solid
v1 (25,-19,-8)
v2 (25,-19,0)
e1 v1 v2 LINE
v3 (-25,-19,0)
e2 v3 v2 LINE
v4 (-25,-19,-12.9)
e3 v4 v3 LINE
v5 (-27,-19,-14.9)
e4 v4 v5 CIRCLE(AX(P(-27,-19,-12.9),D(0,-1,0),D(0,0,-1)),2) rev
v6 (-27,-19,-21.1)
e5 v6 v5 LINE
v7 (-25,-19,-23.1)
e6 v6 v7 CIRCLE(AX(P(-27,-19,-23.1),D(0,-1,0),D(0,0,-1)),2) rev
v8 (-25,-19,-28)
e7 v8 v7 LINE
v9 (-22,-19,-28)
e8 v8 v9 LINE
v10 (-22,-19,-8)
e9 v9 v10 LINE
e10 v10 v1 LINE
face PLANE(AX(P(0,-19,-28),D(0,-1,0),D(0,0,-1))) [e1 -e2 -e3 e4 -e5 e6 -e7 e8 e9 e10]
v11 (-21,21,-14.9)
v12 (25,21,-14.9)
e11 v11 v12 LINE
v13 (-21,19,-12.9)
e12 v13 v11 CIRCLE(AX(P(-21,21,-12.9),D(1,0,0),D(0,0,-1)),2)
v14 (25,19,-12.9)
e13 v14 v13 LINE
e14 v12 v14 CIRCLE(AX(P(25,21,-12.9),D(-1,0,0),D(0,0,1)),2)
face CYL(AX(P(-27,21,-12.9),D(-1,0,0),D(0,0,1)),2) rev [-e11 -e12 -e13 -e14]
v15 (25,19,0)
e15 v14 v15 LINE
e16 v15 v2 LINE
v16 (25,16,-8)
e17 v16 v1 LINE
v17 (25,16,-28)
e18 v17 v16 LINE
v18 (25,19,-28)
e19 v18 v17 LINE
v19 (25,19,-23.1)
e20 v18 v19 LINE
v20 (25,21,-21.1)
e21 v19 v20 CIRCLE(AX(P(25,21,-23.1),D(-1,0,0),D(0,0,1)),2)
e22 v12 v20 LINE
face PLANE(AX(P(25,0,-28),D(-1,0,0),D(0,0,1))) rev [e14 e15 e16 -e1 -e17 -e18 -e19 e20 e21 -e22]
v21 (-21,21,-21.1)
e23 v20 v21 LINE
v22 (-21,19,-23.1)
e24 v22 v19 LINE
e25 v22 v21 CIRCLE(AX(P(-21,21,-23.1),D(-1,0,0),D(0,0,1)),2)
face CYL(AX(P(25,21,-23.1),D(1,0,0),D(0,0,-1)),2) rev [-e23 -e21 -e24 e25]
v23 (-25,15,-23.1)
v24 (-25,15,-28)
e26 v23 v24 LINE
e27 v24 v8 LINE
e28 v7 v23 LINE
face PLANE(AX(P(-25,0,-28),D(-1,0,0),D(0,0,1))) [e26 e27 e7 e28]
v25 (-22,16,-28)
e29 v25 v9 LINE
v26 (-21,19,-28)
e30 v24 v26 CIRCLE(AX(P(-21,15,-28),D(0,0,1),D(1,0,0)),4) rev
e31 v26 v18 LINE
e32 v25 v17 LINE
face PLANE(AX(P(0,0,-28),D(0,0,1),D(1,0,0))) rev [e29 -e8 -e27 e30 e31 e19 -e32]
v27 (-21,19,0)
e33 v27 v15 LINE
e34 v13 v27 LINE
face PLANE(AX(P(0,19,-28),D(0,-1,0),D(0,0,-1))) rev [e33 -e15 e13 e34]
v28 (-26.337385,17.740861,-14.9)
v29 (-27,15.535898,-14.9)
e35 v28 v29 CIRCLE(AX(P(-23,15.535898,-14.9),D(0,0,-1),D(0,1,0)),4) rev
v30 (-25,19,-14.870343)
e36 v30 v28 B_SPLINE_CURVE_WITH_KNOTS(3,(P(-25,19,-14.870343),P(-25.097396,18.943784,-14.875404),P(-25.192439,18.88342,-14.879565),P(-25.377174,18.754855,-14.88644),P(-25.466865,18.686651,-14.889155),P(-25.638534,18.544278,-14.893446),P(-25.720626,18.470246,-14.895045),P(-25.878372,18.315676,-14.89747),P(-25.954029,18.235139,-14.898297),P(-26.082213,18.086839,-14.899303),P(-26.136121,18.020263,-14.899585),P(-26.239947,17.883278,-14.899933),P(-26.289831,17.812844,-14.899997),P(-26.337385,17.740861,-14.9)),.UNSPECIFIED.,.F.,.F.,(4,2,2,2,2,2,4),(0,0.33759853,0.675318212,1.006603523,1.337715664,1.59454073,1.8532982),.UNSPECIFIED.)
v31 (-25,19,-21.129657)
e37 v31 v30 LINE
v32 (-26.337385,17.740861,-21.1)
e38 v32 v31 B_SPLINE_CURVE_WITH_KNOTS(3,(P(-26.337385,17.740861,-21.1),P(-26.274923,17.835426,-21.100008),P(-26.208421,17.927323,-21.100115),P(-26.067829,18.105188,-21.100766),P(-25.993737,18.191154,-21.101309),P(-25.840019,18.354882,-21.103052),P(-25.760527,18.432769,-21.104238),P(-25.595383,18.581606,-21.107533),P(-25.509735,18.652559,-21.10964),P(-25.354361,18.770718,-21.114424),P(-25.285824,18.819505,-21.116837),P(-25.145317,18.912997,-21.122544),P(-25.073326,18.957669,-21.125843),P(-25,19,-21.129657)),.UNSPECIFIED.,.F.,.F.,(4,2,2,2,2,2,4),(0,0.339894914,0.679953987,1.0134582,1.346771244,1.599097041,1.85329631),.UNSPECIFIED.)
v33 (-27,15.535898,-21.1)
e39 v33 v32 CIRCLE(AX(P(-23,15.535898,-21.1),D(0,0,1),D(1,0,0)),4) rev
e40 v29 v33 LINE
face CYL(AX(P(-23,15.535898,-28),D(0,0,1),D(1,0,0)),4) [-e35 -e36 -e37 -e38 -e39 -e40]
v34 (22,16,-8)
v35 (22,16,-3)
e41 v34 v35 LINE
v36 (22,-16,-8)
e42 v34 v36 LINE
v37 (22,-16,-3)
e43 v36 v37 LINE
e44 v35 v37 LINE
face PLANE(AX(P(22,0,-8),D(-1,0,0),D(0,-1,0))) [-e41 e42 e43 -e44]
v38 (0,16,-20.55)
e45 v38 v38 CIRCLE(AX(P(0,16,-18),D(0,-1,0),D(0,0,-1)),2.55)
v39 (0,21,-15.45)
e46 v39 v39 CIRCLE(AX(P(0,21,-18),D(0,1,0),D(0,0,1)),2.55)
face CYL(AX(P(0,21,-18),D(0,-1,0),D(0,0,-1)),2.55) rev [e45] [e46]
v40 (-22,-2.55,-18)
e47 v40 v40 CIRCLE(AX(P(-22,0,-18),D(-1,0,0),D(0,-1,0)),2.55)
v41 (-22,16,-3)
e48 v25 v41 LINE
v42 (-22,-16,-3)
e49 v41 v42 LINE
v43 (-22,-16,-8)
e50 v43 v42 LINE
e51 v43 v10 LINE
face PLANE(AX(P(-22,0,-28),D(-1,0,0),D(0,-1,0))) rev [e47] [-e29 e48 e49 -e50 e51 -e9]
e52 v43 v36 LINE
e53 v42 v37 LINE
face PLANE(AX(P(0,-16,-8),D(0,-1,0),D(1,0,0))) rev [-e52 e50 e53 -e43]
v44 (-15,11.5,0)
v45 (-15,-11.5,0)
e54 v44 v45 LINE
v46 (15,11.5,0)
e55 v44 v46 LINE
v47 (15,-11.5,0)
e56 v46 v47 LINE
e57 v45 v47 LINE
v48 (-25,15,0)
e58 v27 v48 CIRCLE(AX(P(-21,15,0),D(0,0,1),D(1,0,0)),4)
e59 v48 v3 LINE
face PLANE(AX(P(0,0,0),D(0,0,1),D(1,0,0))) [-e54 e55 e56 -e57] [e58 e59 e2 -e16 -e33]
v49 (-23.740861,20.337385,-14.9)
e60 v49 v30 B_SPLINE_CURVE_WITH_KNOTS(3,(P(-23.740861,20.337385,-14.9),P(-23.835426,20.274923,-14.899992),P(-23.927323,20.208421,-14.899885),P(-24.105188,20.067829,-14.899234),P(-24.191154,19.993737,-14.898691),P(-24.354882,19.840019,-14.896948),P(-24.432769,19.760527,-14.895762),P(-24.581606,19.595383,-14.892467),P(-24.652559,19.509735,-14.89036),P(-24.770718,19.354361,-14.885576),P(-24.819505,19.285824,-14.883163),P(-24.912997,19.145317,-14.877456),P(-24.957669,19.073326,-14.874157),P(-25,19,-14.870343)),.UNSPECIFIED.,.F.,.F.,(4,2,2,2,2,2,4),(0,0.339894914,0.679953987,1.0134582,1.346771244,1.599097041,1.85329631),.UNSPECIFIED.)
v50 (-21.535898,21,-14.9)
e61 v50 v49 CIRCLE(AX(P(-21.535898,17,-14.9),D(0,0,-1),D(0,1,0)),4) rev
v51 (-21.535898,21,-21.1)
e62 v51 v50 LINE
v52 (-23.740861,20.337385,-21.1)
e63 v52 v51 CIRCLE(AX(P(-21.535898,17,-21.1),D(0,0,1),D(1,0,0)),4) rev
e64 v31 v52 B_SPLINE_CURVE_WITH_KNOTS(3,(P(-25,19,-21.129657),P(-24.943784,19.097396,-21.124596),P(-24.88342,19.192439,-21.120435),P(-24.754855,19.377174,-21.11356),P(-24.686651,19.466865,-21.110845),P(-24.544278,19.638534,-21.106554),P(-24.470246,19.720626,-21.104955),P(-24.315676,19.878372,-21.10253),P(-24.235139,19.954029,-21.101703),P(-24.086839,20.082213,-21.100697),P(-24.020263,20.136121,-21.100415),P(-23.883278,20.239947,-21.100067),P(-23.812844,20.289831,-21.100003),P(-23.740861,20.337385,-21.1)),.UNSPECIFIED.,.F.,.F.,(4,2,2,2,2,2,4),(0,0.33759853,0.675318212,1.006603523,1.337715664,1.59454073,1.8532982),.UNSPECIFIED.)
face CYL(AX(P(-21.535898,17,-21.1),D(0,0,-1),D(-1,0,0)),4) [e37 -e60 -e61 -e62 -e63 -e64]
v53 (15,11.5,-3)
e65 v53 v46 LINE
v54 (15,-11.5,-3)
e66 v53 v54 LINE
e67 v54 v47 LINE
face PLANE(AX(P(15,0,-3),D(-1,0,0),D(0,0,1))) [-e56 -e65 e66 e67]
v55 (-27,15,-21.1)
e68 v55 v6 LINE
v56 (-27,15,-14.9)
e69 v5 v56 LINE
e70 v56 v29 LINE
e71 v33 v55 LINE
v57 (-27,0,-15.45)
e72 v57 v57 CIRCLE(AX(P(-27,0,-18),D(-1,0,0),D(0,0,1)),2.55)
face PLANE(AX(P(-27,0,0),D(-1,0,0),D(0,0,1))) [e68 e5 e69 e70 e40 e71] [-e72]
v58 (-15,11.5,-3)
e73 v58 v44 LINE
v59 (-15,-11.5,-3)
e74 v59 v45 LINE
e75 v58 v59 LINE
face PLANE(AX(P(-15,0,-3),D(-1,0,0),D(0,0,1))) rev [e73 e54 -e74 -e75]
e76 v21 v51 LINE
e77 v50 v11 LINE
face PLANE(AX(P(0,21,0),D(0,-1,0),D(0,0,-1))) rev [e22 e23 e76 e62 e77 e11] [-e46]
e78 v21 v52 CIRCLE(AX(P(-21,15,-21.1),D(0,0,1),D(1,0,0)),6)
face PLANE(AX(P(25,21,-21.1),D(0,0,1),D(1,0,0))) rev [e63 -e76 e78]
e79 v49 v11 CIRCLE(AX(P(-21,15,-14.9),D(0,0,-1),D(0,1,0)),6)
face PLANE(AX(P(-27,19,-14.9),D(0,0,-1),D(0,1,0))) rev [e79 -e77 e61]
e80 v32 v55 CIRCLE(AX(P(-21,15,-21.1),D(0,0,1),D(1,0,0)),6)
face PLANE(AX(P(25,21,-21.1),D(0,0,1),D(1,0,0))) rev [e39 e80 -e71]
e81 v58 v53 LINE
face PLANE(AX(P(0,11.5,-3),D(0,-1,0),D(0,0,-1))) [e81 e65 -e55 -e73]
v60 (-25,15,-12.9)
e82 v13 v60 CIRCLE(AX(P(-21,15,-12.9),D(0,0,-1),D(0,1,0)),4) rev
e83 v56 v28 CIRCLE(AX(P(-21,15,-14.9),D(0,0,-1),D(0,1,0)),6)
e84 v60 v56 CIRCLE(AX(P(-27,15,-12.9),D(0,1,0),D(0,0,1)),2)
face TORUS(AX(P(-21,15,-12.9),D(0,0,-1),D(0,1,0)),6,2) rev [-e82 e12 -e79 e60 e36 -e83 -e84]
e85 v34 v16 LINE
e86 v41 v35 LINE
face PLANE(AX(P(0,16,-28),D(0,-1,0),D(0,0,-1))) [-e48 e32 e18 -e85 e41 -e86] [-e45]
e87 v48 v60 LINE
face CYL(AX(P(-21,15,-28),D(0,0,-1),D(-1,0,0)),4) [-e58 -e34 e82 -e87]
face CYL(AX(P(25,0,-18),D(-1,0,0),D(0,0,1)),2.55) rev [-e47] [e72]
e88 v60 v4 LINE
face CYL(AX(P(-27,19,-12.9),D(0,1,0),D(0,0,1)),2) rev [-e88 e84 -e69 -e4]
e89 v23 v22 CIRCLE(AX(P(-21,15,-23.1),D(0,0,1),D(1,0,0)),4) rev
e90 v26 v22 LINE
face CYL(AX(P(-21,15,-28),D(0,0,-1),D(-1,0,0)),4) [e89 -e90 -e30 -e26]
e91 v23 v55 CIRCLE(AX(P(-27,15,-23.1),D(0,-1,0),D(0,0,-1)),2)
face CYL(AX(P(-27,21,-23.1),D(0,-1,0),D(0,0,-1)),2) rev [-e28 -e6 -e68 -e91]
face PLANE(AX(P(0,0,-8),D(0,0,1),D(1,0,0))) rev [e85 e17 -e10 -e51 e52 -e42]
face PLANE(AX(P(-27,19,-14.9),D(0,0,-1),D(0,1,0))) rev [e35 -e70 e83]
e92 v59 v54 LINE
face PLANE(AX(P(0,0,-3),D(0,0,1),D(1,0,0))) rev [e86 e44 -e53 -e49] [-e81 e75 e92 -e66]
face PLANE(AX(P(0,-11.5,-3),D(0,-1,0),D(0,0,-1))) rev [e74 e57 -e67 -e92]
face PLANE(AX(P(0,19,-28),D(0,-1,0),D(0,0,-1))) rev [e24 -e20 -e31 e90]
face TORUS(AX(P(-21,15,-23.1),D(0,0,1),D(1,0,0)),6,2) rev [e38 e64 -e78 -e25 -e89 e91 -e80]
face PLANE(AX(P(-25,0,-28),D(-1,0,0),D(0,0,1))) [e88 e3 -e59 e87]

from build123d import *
from build123d.topology import SkipClean

# Parameters (mm, degrees)
SKETCH_1_W          = 44
SKETCH_1_H          = 32
SKETCH_1_W_2        = 30
SKETCH_1_H_2        = 23
EXTRUDE_1_DEPTH     = 3
SKETCH_1_3_W        = 3
SKETCH_1_3_H        = 3
EXTRUDE_2_DEPTH     = 28
EXTRUDE_3_DEPTH     = 8
SKETCH_2_R          = 2.55
CUT_EXTRUDE_2_DEPTH = 61.373835392
EXTRUDE_START       = 2
SKETCH_2_3_W        = 6.2
SKETCH_2_3_H        = 38
SKETCH_2_3_R        = 2.55
EXTRUDE_4_DEPTH     = 2
SKETCH_3_W          = 50
SKETCH_3_H          = 6.2
SKETCH_3_R          = 2.55
EXTRUDE_5_DEPTH     = 2
SKETCH_3_2_R        = 2.55
CUT_EXTRUDE_3_DEPTH = 55.378304497
FILLET_2_R          = 4
FILLET_3_R          = 2
FILLET_4_R          = 4


with BuildPart() as part:
    # 草图1 → 凸台-拉伸1 (new body)
    with BuildSketch(Plane.XY):
        Rectangle(SKETCH_1_W, SKETCH_1_H)
        Rectangle(SKETCH_1_W_2, SKETCH_1_H_2, mode=Mode.SUBTRACT)
    extrude(amount=-EXTRUDE_1_DEPTH)

    # 草图1<3> → 凸台-拉伸2 (add)
    with BuildSketch(Plane.XY):
        Polygon((-22, -16), (-22, 16), (22, 16), (22, 19), (-25, 19), (-25, -16), align=None)
        with Locations((-23.5, -17.5)):
            Rectangle(SKETCH_1_3_W, SKETCH_1_3_H)
        with Locations((23.5, 17.5)):
            Rectangle(SKETCH_1_3_W, SKETCH_1_3_H)
    extrude(amount=-EXTRUDE_2_DEPTH)

    # 草图1<4> → 凸台-拉伸3 (add)
    with BuildSketch(Plane.XY):
        Polygon((25, 16), (22, 16), (22, -16), (-22, -16), (-22, -19), (25, -19), align=None)
    extrude(amount=-EXTRUDE_3_DEPTH)

    # 草图2 → 切除-拉伸2 (cut, through all)
    with BuildSketch(Plane.ZY.offset(25)):
        with Locations((-18, 0)):
            Circle(SKETCH_2_R)
    extrude(amount=-CUT_EXTRUDE_2_DEPTH, mode=Mode.SUBTRACT)

    # 草图2<3> → 凸台-拉伸4 (add)
    with BuildSketch(Plane.ZY.offset(25).offset(EXTRUDE_START)):
        with Locations((-18, 0)):
            Rectangle(SKETCH_2_3_W, SKETCH_2_3_H)
        with Locations((-18, 0)):
            Circle(SKETCH_2_3_R, mode=Mode.SUBTRACT)
    extrude(amount=-EXTRUDE_4_DEPTH)

    # 草图3 → 凸台-拉伸5 (add)
    with BuildSketch(Plane(origin=(0, 19, 0), x_dir=(1, 0, 0), z_dir=(0, 1, 0))):
        with Locations((0, 18)):
            Rectangle(SKETCH_3_W, SKETCH_3_H)
        with Locations(Location((0, 18, 0), (0, 0, 270))):
            Circle(SKETCH_3_R, mode=Mode.SUBTRACT)
    extrude(amount=EXTRUDE_5_DEPTH)

    # 草图3<2> → 切除-拉伸3 (cut, through all)
    with SkipClean():  # the faces are left unmerged after this step: merging them gives an invalid solid
        with BuildSketch(Plane(origin=(0, 19, 0), x_dir=(1, 0, 0), z_dir=(0, 1, 0))):
            with Locations(Location((0, 18, 0), (0, 0, 90))):
                Circle(SKETCH_3_2_R)
        extrude(amount=-CUT_EXTRUDE_3_DEPTH, mode=Mode.SUBTRACT)
    add(part.part.scale(1), mode=Mode.REPLACE)  # the faces are merged on a copy

    # 圆角2
    # the kernel refuses this fillet: 4 mm, written as the material it takes off along each edge
    with BuildSketch(Plane(origin=(-25, 19, -11.1), x_dir=(1, 0, 0), z_dir=(0, 0, -1))) as fillet_2_piece_1_section:
        with BuildLine():
            CenterArc((FILLET_2_R, FILLET_2_R), FILLET_2_R, 180, 90)
            Line((0, FILLET_2_R), (0, 0))
            Line((0, 0), (FILLET_2_R, 0))
        make_face()
    fillet_2_piece_1 = extrude(amount=26.9, mode=Mode.PRIVATE)
    fillet_2_piece_1 = split(fillet_2_piece_1, bisect_by=Plane(origin=(-24.094419543, 18.094419543, -14.9), z_dir=(0, 0, 1)), keep=Keep.TOP, mode=Mode.PRIVATE)
    add(fillet_2_piece_1, mode=Mode.SUBTRACT)
    with BuildSketch(Plane(origin=(-25, 19, -21.1), x_dir=(1, 0, 0), z_dir=(0, 0, -1))) as fillet_2_piece_2:
        with BuildLine():
            CenterArc((FILLET_2_R, FILLET_2_R), FILLET_2_R, 180, 90)
            Line((0, FILLET_2_R), (0, 0))
            Line((0, 0), (FILLET_2_R, 0))
        make_face()
    extrude(amount=16.9, mode=Mode.SUBTRACT)
    with BuildSketch(Plane(origin=(-25, 19, 10), x_dir=(1, 0, 0), z_dir=(0, 0, -1))) as fillet_2_piece_3:
        with BuildLine():
            CenterArc((FILLET_2_R, FILLET_2_R), FILLET_2_R, 180, 90)
            Line((0, FILLET_2_R), (0, 0))
            Line((0, 0), (FILLET_2_R, 0))
        make_face()
    extrude(amount=24.9, mode=Mode.SUBTRACT)
    with BuildSketch(Plane(origin=(-25, 19, 10), x_dir=(1, 0, 0), z_dir=(0, 0, -1))) as fillet_2_piece_4_section:
        with BuildLine():
            CenterArc((FILLET_2_R, FILLET_2_R), FILLET_2_R, 180, 90)
            Line((0, FILLET_2_R), (0, 0))
            Line((0, 0), (FILLET_2_R, 0))
        make_face()
    fillet_2_piece_4 = extrude(amount=34.9, mode=Mode.PRIVATE)
    fillet_2_piece_4 = split(fillet_2_piece_4, bisect_by=Plane(origin=(-24.094419543, 18.094419543, -21.1), z_dir=(0, 0, -1)), keep=Keep.TOP, mode=Mode.PRIVATE)
    add(fillet_2_piece_4, mode=Mode.SUBTRACT)

    # 圆角3
    # the kernel refuses this fillet: 2 mm, written as the material it adds along each edge
    with BuildSketch(Plane(origin=(-25, 15, -14.9), x_dir=(0, 0, 1), z_dir=(0, -1, 0)), Plane(origin=(-25, -19, -21.1), x_dir=(0, 0, -1), z_dir=(0, 1, 0))) as fillet_3_piece_1:
        with BuildLine():
            CenterArc((FILLET_3_R, FILLET_3_R), FILLET_3_R, 180, 90)
            Line((0, FILLET_3_R), (0, 0))
            Line((0, 0), (FILLET_3_R, 0))
        make_face()
    extrude(amount=34)
    with BuildSketch(Plane(origin=(-21, 19, -14.9), x_dir=(0, 1, 0), z_dir=(1, 0, 0))) as fillet_3_piece_2:
        with BuildLine():
            CenterArc((FILLET_3_R, FILLET_3_R), FILLET_3_R, 180, 90)
            Line((0, FILLET_3_R), (0, 0))
            Line((0, 0), (FILLET_3_R, 0))
        make_face()
    extrude(amount=46)
    with BuildSketch(Plane(origin=(-21, 15, -14.9), x_dir=(0, 1, 0), z_dir=(1, 0, 0))) as fillet_3_piece_3_section:
        with BuildLine():
            CenterArc((4 + FILLET_3_R, FILLET_3_R), FILLET_3_R, 180, 90)
            Line((4, FILLET_3_R), (4, 0))
            Line((4, 0), (4 + FILLET_3_R, 0))
        make_face()
    fillet_3_piece_3 = revolve(axis=Axis((-21, 15, -14.9), (0, 0, 1)), revolution_arc=90, mode=Mode.PRIVATE)
    fillet_3_piece_3 = split(fillet_3_piece_3, bisect_by=Plane(origin=(-25, 19.477397307, -14.620539083), z_dir=(1, 0, 0)), keep=Keep.TOP, mode=Mode.PRIVATE)
    fillet_3_piece_3 = split(fillet_3_piece_3, bisect_by=Plane(origin=(-22.217423946, 19, -14.620539083), z_dir=(0, 1, 0)), keep=Keep.TOP, mode=Mode.PRIVATE)
    add(fillet_3_piece_3)
    with BuildSketch(Plane(origin=(-21, 15, -14.9), x_dir=(0, 1, 0), z_dir=(1, 0, 0))) as fillet_3_piece_4_section:
        with BuildLine():
            CenterArc((4 + FILLET_3_R, FILLET_3_R), FILLET_3_R, 180, 90)
            Line((4, FILLET_3_R), (4, 0))
            Line((4, 0), (4 + FILLET_3_R, 0))
        make_face()
    fillet_3_piece_4 = revolve(axis=Axis((-21, 15, -14.9), (0, 0, 1)), revolution_arc=90, mode=Mode.PRIVATE)
    fillet_3_piece_4 = split(fillet_3_piece_4, bisect_by=Plane(origin=(-25, 17.874086427, -14.313906434), z_dir=(1, 0, 0)), keep=Keep.TOP, mode=Mode.PRIVATE)
    fillet_3_piece_4 = split(fillet_3_piece_4, bisect_by=Plane(origin=(-23.874086368, 19, -14.313906434), z_dir=(0, -1, 0)), keep=Keep.TOP, mode=Mode.PRIVATE)
    add(fillet_3_piece_4)
    with BuildSketch(Plane(origin=(-21, 15, -14.9), x_dir=(0, 1, 0), z_dir=(1, 0, 0))) as fillet_3_piece_5_section:
        with BuildLine():
            CenterArc((4 + FILLET_3_R, FILLET_3_R), FILLET_3_R, 180, 90)
            Line((4, FILLET_3_R), (4, 0))
            Line((4, 0), (4 + FILLET_3_R, 0))
        make_face()
    fillet_3_piece_5 = revolve(axis=Axis((-21, 15, -14.9), (0, 0, 1)), revolution_arc=90, mode=Mode.PRIVATE)
    fillet_3_piece_5 = split(fillet_3_piece_5, bisect_by=Plane(origin=(-25, 16.217423741, -14.620538996), z_dir=(-1, 0, 0)), keep=Keep.TOP, mode=Mode.PRIVATE)
    fillet_3_piece_5 = split(fillet_3_piece_5, bisect_by=Plane(origin=(-25.477396893, 19, -14.620538996), z_dir=(0, -1, 0)), keep=Keep.TOP, mode=Mode.PRIVATE)
    add(fillet_3_piece_5)
    with BuildSketch(Plane(origin=(25, 19, -21.1), x_dir=(0, 0, -1), z_dir=(-1, 0, 0))) as fillet_3_piece_6:
        with BuildLine():
            CenterArc((FILLET_3_R, -FILLET_3_R), FILLET_3_R, 90, 90)
            Line((0, -FILLET_3_R), (0, 0))
            Line((0, 0), (FILLET_3_R, 0))
        make_face()
    extrude(amount=46)
    with BuildSketch(Plane(origin=(-21, 15, -21.1), x_dir=(-1, 0, 0), z_dir=(0, -1, 0))) as fillet_3_piece_7_section:
        with BuildLine():
            CenterArc((4 + FILLET_3_R, FILLET_3_R), FILLET_3_R, 180, 90)
            Line((4 + FILLET_3_R, 0), (4, 0))
            Line((4, 0), (4, FILLET_3_R))
        make_face()
    fillet_3_piece_7 = revolve(axis=Axis((-21, 15, -21.1), (0, 0, -1)), revolution_arc=90, mode=Mode.PRIVATE)
    fillet_3_piece_7 = split(fillet_3_piece_7, bisect_by=Plane(origin=(-25, 17.874086364, -21.686093558), z_dir=(1, 0, 0)), keep=Keep.TOP, mode=Mode.PRIVATE)
    fillet_3_piece_7 = split(fillet_3_piece_7, bisect_by=Plane(origin=(-23.874086351, 19, -21.686093558), z_dir=(0, -1, 0)), keep=Keep.TOP, mode=Mode.PRIVATE)
    add(fillet_3_piece_7)
    with BuildSketch(Plane(origin=(-21, 15, -21.1), x_dir=(-1, 0, 0), z_dir=(0, -1, 0))) as fillet_3_piece_8_section:
        with BuildLine():
            CenterArc((4 + FILLET_3_R, FILLET_3_R), FILLET_3_R, 180, 90)
            Line((4 + FILLET_3_R, 0), (4, 0))
            Line((4, 0), (4, FILLET_3_R))
        make_face()
    fillet_3_piece_8 = revolve(axis=Axis((-21, 15, -21.1), (0, 0, -1)), revolution_arc=90, mode=Mode.PRIVATE)
    fillet_3_piece_8 = split(fillet_3_piece_8, bisect_by=Plane(origin=(-25, 16.217424103, -21.379460891), z_dir=(-1, 0, 0)), keep=Keep.TOP, mode=Mode.PRIVATE)
    fillet_3_piece_8 = split(fillet_3_piece_8, bisect_by=Plane(origin=(-25.477397304, 19, -21.379460891), z_dir=(0, -1, 0)), keep=Keep.TOP, mode=Mode.PRIVATE)
    add(fillet_3_piece_8)
    with BuildSketch(Plane(origin=(-21, 15, -21.1), x_dir=(-1, 0, 0), z_dir=(0, -1, 0))) as fillet_3_piece_9_section:
        with BuildLine():
            CenterArc((4 + FILLET_3_R, FILLET_3_R), FILLET_3_R, 180, 90)
            Line((4 + FILLET_3_R, 0), (4, 0))
            Line((4, 0), (4, FILLET_3_R))
        make_face()
    fillet_3_piece_9 = revolve(axis=Axis((-21, 15, -21.1), (0, 0, -1)), revolution_arc=90, mode=Mode.PRIVATE)
    fillet_3_piece_9 = split(fillet_3_piece_9, bisect_by=Plane(origin=(-25, 19.477396901, -21.379461023), z_dir=(1, 0, 0)), keep=Keep.TOP, mode=Mode.PRIVATE)
    fillet_3_piece_9 = split(fillet_3_piece_9, bisect_by=Plane(origin=(-22.217423514, 19, -21.379461023), z_dir=(0, 1, 0)), keep=Keep.TOP, mode=Mode.PRIVATE)
    add(fillet_3_piece_9)

    # 圆角4
    # the kernel refuses this fillet: 4 mm, written as the material it takes off along each edge
    with BuildSketch(Plane(origin=(-25, 21, -29.760254038), x_dir=(1, 0, 0), z_dir=(0, 0, 1))) as fillet_4_piece_1:
        with BuildLine():
            CenterArc((3.464101615, -4), FILLET_4_R, 90, 60)
            Line((0, -2), (-0.069282032, -1.96))
            ThreePointArc((-0.069282032, -1.96), (-0.08, -1), (-0.08, 0))
            Line((-0.08, 0), (0, 0.08))
            Line((0, 0.08), (3.464101615, 0.08))
            Line((3.464101615, 0.08), (3.464101615, 0))
        make_face()
    extrude(amount=23.520508076, mode=Mode.SUBTRACT)
    with BuildSketch(Plane(origin=(-27, 19, -29.760254038), x_dir=(0, -1, 0), z_dir=(0, 0, 1))) as fillet_4_piece_2:
        with BuildLine():
            CenterArc((3.464101615, 4), FILLET_4_R, 210, 60)
            Line((0, 2), (-0.069282032, 1.96))
            ThreePointArc((-0.069282032, 1.96), (-0.08, 1), (-0.08, 0))
            Line((-0.08, 0), (0, -0.08))
            Line((0, -0.08), (3.464101615, -0.08))
            Line((3.464101615, -0.08), (3.464101615, 0))
        make_face()
    extrude(amount=23.520508076, mode=Mode.SUBTRACT)


solid = part.part
